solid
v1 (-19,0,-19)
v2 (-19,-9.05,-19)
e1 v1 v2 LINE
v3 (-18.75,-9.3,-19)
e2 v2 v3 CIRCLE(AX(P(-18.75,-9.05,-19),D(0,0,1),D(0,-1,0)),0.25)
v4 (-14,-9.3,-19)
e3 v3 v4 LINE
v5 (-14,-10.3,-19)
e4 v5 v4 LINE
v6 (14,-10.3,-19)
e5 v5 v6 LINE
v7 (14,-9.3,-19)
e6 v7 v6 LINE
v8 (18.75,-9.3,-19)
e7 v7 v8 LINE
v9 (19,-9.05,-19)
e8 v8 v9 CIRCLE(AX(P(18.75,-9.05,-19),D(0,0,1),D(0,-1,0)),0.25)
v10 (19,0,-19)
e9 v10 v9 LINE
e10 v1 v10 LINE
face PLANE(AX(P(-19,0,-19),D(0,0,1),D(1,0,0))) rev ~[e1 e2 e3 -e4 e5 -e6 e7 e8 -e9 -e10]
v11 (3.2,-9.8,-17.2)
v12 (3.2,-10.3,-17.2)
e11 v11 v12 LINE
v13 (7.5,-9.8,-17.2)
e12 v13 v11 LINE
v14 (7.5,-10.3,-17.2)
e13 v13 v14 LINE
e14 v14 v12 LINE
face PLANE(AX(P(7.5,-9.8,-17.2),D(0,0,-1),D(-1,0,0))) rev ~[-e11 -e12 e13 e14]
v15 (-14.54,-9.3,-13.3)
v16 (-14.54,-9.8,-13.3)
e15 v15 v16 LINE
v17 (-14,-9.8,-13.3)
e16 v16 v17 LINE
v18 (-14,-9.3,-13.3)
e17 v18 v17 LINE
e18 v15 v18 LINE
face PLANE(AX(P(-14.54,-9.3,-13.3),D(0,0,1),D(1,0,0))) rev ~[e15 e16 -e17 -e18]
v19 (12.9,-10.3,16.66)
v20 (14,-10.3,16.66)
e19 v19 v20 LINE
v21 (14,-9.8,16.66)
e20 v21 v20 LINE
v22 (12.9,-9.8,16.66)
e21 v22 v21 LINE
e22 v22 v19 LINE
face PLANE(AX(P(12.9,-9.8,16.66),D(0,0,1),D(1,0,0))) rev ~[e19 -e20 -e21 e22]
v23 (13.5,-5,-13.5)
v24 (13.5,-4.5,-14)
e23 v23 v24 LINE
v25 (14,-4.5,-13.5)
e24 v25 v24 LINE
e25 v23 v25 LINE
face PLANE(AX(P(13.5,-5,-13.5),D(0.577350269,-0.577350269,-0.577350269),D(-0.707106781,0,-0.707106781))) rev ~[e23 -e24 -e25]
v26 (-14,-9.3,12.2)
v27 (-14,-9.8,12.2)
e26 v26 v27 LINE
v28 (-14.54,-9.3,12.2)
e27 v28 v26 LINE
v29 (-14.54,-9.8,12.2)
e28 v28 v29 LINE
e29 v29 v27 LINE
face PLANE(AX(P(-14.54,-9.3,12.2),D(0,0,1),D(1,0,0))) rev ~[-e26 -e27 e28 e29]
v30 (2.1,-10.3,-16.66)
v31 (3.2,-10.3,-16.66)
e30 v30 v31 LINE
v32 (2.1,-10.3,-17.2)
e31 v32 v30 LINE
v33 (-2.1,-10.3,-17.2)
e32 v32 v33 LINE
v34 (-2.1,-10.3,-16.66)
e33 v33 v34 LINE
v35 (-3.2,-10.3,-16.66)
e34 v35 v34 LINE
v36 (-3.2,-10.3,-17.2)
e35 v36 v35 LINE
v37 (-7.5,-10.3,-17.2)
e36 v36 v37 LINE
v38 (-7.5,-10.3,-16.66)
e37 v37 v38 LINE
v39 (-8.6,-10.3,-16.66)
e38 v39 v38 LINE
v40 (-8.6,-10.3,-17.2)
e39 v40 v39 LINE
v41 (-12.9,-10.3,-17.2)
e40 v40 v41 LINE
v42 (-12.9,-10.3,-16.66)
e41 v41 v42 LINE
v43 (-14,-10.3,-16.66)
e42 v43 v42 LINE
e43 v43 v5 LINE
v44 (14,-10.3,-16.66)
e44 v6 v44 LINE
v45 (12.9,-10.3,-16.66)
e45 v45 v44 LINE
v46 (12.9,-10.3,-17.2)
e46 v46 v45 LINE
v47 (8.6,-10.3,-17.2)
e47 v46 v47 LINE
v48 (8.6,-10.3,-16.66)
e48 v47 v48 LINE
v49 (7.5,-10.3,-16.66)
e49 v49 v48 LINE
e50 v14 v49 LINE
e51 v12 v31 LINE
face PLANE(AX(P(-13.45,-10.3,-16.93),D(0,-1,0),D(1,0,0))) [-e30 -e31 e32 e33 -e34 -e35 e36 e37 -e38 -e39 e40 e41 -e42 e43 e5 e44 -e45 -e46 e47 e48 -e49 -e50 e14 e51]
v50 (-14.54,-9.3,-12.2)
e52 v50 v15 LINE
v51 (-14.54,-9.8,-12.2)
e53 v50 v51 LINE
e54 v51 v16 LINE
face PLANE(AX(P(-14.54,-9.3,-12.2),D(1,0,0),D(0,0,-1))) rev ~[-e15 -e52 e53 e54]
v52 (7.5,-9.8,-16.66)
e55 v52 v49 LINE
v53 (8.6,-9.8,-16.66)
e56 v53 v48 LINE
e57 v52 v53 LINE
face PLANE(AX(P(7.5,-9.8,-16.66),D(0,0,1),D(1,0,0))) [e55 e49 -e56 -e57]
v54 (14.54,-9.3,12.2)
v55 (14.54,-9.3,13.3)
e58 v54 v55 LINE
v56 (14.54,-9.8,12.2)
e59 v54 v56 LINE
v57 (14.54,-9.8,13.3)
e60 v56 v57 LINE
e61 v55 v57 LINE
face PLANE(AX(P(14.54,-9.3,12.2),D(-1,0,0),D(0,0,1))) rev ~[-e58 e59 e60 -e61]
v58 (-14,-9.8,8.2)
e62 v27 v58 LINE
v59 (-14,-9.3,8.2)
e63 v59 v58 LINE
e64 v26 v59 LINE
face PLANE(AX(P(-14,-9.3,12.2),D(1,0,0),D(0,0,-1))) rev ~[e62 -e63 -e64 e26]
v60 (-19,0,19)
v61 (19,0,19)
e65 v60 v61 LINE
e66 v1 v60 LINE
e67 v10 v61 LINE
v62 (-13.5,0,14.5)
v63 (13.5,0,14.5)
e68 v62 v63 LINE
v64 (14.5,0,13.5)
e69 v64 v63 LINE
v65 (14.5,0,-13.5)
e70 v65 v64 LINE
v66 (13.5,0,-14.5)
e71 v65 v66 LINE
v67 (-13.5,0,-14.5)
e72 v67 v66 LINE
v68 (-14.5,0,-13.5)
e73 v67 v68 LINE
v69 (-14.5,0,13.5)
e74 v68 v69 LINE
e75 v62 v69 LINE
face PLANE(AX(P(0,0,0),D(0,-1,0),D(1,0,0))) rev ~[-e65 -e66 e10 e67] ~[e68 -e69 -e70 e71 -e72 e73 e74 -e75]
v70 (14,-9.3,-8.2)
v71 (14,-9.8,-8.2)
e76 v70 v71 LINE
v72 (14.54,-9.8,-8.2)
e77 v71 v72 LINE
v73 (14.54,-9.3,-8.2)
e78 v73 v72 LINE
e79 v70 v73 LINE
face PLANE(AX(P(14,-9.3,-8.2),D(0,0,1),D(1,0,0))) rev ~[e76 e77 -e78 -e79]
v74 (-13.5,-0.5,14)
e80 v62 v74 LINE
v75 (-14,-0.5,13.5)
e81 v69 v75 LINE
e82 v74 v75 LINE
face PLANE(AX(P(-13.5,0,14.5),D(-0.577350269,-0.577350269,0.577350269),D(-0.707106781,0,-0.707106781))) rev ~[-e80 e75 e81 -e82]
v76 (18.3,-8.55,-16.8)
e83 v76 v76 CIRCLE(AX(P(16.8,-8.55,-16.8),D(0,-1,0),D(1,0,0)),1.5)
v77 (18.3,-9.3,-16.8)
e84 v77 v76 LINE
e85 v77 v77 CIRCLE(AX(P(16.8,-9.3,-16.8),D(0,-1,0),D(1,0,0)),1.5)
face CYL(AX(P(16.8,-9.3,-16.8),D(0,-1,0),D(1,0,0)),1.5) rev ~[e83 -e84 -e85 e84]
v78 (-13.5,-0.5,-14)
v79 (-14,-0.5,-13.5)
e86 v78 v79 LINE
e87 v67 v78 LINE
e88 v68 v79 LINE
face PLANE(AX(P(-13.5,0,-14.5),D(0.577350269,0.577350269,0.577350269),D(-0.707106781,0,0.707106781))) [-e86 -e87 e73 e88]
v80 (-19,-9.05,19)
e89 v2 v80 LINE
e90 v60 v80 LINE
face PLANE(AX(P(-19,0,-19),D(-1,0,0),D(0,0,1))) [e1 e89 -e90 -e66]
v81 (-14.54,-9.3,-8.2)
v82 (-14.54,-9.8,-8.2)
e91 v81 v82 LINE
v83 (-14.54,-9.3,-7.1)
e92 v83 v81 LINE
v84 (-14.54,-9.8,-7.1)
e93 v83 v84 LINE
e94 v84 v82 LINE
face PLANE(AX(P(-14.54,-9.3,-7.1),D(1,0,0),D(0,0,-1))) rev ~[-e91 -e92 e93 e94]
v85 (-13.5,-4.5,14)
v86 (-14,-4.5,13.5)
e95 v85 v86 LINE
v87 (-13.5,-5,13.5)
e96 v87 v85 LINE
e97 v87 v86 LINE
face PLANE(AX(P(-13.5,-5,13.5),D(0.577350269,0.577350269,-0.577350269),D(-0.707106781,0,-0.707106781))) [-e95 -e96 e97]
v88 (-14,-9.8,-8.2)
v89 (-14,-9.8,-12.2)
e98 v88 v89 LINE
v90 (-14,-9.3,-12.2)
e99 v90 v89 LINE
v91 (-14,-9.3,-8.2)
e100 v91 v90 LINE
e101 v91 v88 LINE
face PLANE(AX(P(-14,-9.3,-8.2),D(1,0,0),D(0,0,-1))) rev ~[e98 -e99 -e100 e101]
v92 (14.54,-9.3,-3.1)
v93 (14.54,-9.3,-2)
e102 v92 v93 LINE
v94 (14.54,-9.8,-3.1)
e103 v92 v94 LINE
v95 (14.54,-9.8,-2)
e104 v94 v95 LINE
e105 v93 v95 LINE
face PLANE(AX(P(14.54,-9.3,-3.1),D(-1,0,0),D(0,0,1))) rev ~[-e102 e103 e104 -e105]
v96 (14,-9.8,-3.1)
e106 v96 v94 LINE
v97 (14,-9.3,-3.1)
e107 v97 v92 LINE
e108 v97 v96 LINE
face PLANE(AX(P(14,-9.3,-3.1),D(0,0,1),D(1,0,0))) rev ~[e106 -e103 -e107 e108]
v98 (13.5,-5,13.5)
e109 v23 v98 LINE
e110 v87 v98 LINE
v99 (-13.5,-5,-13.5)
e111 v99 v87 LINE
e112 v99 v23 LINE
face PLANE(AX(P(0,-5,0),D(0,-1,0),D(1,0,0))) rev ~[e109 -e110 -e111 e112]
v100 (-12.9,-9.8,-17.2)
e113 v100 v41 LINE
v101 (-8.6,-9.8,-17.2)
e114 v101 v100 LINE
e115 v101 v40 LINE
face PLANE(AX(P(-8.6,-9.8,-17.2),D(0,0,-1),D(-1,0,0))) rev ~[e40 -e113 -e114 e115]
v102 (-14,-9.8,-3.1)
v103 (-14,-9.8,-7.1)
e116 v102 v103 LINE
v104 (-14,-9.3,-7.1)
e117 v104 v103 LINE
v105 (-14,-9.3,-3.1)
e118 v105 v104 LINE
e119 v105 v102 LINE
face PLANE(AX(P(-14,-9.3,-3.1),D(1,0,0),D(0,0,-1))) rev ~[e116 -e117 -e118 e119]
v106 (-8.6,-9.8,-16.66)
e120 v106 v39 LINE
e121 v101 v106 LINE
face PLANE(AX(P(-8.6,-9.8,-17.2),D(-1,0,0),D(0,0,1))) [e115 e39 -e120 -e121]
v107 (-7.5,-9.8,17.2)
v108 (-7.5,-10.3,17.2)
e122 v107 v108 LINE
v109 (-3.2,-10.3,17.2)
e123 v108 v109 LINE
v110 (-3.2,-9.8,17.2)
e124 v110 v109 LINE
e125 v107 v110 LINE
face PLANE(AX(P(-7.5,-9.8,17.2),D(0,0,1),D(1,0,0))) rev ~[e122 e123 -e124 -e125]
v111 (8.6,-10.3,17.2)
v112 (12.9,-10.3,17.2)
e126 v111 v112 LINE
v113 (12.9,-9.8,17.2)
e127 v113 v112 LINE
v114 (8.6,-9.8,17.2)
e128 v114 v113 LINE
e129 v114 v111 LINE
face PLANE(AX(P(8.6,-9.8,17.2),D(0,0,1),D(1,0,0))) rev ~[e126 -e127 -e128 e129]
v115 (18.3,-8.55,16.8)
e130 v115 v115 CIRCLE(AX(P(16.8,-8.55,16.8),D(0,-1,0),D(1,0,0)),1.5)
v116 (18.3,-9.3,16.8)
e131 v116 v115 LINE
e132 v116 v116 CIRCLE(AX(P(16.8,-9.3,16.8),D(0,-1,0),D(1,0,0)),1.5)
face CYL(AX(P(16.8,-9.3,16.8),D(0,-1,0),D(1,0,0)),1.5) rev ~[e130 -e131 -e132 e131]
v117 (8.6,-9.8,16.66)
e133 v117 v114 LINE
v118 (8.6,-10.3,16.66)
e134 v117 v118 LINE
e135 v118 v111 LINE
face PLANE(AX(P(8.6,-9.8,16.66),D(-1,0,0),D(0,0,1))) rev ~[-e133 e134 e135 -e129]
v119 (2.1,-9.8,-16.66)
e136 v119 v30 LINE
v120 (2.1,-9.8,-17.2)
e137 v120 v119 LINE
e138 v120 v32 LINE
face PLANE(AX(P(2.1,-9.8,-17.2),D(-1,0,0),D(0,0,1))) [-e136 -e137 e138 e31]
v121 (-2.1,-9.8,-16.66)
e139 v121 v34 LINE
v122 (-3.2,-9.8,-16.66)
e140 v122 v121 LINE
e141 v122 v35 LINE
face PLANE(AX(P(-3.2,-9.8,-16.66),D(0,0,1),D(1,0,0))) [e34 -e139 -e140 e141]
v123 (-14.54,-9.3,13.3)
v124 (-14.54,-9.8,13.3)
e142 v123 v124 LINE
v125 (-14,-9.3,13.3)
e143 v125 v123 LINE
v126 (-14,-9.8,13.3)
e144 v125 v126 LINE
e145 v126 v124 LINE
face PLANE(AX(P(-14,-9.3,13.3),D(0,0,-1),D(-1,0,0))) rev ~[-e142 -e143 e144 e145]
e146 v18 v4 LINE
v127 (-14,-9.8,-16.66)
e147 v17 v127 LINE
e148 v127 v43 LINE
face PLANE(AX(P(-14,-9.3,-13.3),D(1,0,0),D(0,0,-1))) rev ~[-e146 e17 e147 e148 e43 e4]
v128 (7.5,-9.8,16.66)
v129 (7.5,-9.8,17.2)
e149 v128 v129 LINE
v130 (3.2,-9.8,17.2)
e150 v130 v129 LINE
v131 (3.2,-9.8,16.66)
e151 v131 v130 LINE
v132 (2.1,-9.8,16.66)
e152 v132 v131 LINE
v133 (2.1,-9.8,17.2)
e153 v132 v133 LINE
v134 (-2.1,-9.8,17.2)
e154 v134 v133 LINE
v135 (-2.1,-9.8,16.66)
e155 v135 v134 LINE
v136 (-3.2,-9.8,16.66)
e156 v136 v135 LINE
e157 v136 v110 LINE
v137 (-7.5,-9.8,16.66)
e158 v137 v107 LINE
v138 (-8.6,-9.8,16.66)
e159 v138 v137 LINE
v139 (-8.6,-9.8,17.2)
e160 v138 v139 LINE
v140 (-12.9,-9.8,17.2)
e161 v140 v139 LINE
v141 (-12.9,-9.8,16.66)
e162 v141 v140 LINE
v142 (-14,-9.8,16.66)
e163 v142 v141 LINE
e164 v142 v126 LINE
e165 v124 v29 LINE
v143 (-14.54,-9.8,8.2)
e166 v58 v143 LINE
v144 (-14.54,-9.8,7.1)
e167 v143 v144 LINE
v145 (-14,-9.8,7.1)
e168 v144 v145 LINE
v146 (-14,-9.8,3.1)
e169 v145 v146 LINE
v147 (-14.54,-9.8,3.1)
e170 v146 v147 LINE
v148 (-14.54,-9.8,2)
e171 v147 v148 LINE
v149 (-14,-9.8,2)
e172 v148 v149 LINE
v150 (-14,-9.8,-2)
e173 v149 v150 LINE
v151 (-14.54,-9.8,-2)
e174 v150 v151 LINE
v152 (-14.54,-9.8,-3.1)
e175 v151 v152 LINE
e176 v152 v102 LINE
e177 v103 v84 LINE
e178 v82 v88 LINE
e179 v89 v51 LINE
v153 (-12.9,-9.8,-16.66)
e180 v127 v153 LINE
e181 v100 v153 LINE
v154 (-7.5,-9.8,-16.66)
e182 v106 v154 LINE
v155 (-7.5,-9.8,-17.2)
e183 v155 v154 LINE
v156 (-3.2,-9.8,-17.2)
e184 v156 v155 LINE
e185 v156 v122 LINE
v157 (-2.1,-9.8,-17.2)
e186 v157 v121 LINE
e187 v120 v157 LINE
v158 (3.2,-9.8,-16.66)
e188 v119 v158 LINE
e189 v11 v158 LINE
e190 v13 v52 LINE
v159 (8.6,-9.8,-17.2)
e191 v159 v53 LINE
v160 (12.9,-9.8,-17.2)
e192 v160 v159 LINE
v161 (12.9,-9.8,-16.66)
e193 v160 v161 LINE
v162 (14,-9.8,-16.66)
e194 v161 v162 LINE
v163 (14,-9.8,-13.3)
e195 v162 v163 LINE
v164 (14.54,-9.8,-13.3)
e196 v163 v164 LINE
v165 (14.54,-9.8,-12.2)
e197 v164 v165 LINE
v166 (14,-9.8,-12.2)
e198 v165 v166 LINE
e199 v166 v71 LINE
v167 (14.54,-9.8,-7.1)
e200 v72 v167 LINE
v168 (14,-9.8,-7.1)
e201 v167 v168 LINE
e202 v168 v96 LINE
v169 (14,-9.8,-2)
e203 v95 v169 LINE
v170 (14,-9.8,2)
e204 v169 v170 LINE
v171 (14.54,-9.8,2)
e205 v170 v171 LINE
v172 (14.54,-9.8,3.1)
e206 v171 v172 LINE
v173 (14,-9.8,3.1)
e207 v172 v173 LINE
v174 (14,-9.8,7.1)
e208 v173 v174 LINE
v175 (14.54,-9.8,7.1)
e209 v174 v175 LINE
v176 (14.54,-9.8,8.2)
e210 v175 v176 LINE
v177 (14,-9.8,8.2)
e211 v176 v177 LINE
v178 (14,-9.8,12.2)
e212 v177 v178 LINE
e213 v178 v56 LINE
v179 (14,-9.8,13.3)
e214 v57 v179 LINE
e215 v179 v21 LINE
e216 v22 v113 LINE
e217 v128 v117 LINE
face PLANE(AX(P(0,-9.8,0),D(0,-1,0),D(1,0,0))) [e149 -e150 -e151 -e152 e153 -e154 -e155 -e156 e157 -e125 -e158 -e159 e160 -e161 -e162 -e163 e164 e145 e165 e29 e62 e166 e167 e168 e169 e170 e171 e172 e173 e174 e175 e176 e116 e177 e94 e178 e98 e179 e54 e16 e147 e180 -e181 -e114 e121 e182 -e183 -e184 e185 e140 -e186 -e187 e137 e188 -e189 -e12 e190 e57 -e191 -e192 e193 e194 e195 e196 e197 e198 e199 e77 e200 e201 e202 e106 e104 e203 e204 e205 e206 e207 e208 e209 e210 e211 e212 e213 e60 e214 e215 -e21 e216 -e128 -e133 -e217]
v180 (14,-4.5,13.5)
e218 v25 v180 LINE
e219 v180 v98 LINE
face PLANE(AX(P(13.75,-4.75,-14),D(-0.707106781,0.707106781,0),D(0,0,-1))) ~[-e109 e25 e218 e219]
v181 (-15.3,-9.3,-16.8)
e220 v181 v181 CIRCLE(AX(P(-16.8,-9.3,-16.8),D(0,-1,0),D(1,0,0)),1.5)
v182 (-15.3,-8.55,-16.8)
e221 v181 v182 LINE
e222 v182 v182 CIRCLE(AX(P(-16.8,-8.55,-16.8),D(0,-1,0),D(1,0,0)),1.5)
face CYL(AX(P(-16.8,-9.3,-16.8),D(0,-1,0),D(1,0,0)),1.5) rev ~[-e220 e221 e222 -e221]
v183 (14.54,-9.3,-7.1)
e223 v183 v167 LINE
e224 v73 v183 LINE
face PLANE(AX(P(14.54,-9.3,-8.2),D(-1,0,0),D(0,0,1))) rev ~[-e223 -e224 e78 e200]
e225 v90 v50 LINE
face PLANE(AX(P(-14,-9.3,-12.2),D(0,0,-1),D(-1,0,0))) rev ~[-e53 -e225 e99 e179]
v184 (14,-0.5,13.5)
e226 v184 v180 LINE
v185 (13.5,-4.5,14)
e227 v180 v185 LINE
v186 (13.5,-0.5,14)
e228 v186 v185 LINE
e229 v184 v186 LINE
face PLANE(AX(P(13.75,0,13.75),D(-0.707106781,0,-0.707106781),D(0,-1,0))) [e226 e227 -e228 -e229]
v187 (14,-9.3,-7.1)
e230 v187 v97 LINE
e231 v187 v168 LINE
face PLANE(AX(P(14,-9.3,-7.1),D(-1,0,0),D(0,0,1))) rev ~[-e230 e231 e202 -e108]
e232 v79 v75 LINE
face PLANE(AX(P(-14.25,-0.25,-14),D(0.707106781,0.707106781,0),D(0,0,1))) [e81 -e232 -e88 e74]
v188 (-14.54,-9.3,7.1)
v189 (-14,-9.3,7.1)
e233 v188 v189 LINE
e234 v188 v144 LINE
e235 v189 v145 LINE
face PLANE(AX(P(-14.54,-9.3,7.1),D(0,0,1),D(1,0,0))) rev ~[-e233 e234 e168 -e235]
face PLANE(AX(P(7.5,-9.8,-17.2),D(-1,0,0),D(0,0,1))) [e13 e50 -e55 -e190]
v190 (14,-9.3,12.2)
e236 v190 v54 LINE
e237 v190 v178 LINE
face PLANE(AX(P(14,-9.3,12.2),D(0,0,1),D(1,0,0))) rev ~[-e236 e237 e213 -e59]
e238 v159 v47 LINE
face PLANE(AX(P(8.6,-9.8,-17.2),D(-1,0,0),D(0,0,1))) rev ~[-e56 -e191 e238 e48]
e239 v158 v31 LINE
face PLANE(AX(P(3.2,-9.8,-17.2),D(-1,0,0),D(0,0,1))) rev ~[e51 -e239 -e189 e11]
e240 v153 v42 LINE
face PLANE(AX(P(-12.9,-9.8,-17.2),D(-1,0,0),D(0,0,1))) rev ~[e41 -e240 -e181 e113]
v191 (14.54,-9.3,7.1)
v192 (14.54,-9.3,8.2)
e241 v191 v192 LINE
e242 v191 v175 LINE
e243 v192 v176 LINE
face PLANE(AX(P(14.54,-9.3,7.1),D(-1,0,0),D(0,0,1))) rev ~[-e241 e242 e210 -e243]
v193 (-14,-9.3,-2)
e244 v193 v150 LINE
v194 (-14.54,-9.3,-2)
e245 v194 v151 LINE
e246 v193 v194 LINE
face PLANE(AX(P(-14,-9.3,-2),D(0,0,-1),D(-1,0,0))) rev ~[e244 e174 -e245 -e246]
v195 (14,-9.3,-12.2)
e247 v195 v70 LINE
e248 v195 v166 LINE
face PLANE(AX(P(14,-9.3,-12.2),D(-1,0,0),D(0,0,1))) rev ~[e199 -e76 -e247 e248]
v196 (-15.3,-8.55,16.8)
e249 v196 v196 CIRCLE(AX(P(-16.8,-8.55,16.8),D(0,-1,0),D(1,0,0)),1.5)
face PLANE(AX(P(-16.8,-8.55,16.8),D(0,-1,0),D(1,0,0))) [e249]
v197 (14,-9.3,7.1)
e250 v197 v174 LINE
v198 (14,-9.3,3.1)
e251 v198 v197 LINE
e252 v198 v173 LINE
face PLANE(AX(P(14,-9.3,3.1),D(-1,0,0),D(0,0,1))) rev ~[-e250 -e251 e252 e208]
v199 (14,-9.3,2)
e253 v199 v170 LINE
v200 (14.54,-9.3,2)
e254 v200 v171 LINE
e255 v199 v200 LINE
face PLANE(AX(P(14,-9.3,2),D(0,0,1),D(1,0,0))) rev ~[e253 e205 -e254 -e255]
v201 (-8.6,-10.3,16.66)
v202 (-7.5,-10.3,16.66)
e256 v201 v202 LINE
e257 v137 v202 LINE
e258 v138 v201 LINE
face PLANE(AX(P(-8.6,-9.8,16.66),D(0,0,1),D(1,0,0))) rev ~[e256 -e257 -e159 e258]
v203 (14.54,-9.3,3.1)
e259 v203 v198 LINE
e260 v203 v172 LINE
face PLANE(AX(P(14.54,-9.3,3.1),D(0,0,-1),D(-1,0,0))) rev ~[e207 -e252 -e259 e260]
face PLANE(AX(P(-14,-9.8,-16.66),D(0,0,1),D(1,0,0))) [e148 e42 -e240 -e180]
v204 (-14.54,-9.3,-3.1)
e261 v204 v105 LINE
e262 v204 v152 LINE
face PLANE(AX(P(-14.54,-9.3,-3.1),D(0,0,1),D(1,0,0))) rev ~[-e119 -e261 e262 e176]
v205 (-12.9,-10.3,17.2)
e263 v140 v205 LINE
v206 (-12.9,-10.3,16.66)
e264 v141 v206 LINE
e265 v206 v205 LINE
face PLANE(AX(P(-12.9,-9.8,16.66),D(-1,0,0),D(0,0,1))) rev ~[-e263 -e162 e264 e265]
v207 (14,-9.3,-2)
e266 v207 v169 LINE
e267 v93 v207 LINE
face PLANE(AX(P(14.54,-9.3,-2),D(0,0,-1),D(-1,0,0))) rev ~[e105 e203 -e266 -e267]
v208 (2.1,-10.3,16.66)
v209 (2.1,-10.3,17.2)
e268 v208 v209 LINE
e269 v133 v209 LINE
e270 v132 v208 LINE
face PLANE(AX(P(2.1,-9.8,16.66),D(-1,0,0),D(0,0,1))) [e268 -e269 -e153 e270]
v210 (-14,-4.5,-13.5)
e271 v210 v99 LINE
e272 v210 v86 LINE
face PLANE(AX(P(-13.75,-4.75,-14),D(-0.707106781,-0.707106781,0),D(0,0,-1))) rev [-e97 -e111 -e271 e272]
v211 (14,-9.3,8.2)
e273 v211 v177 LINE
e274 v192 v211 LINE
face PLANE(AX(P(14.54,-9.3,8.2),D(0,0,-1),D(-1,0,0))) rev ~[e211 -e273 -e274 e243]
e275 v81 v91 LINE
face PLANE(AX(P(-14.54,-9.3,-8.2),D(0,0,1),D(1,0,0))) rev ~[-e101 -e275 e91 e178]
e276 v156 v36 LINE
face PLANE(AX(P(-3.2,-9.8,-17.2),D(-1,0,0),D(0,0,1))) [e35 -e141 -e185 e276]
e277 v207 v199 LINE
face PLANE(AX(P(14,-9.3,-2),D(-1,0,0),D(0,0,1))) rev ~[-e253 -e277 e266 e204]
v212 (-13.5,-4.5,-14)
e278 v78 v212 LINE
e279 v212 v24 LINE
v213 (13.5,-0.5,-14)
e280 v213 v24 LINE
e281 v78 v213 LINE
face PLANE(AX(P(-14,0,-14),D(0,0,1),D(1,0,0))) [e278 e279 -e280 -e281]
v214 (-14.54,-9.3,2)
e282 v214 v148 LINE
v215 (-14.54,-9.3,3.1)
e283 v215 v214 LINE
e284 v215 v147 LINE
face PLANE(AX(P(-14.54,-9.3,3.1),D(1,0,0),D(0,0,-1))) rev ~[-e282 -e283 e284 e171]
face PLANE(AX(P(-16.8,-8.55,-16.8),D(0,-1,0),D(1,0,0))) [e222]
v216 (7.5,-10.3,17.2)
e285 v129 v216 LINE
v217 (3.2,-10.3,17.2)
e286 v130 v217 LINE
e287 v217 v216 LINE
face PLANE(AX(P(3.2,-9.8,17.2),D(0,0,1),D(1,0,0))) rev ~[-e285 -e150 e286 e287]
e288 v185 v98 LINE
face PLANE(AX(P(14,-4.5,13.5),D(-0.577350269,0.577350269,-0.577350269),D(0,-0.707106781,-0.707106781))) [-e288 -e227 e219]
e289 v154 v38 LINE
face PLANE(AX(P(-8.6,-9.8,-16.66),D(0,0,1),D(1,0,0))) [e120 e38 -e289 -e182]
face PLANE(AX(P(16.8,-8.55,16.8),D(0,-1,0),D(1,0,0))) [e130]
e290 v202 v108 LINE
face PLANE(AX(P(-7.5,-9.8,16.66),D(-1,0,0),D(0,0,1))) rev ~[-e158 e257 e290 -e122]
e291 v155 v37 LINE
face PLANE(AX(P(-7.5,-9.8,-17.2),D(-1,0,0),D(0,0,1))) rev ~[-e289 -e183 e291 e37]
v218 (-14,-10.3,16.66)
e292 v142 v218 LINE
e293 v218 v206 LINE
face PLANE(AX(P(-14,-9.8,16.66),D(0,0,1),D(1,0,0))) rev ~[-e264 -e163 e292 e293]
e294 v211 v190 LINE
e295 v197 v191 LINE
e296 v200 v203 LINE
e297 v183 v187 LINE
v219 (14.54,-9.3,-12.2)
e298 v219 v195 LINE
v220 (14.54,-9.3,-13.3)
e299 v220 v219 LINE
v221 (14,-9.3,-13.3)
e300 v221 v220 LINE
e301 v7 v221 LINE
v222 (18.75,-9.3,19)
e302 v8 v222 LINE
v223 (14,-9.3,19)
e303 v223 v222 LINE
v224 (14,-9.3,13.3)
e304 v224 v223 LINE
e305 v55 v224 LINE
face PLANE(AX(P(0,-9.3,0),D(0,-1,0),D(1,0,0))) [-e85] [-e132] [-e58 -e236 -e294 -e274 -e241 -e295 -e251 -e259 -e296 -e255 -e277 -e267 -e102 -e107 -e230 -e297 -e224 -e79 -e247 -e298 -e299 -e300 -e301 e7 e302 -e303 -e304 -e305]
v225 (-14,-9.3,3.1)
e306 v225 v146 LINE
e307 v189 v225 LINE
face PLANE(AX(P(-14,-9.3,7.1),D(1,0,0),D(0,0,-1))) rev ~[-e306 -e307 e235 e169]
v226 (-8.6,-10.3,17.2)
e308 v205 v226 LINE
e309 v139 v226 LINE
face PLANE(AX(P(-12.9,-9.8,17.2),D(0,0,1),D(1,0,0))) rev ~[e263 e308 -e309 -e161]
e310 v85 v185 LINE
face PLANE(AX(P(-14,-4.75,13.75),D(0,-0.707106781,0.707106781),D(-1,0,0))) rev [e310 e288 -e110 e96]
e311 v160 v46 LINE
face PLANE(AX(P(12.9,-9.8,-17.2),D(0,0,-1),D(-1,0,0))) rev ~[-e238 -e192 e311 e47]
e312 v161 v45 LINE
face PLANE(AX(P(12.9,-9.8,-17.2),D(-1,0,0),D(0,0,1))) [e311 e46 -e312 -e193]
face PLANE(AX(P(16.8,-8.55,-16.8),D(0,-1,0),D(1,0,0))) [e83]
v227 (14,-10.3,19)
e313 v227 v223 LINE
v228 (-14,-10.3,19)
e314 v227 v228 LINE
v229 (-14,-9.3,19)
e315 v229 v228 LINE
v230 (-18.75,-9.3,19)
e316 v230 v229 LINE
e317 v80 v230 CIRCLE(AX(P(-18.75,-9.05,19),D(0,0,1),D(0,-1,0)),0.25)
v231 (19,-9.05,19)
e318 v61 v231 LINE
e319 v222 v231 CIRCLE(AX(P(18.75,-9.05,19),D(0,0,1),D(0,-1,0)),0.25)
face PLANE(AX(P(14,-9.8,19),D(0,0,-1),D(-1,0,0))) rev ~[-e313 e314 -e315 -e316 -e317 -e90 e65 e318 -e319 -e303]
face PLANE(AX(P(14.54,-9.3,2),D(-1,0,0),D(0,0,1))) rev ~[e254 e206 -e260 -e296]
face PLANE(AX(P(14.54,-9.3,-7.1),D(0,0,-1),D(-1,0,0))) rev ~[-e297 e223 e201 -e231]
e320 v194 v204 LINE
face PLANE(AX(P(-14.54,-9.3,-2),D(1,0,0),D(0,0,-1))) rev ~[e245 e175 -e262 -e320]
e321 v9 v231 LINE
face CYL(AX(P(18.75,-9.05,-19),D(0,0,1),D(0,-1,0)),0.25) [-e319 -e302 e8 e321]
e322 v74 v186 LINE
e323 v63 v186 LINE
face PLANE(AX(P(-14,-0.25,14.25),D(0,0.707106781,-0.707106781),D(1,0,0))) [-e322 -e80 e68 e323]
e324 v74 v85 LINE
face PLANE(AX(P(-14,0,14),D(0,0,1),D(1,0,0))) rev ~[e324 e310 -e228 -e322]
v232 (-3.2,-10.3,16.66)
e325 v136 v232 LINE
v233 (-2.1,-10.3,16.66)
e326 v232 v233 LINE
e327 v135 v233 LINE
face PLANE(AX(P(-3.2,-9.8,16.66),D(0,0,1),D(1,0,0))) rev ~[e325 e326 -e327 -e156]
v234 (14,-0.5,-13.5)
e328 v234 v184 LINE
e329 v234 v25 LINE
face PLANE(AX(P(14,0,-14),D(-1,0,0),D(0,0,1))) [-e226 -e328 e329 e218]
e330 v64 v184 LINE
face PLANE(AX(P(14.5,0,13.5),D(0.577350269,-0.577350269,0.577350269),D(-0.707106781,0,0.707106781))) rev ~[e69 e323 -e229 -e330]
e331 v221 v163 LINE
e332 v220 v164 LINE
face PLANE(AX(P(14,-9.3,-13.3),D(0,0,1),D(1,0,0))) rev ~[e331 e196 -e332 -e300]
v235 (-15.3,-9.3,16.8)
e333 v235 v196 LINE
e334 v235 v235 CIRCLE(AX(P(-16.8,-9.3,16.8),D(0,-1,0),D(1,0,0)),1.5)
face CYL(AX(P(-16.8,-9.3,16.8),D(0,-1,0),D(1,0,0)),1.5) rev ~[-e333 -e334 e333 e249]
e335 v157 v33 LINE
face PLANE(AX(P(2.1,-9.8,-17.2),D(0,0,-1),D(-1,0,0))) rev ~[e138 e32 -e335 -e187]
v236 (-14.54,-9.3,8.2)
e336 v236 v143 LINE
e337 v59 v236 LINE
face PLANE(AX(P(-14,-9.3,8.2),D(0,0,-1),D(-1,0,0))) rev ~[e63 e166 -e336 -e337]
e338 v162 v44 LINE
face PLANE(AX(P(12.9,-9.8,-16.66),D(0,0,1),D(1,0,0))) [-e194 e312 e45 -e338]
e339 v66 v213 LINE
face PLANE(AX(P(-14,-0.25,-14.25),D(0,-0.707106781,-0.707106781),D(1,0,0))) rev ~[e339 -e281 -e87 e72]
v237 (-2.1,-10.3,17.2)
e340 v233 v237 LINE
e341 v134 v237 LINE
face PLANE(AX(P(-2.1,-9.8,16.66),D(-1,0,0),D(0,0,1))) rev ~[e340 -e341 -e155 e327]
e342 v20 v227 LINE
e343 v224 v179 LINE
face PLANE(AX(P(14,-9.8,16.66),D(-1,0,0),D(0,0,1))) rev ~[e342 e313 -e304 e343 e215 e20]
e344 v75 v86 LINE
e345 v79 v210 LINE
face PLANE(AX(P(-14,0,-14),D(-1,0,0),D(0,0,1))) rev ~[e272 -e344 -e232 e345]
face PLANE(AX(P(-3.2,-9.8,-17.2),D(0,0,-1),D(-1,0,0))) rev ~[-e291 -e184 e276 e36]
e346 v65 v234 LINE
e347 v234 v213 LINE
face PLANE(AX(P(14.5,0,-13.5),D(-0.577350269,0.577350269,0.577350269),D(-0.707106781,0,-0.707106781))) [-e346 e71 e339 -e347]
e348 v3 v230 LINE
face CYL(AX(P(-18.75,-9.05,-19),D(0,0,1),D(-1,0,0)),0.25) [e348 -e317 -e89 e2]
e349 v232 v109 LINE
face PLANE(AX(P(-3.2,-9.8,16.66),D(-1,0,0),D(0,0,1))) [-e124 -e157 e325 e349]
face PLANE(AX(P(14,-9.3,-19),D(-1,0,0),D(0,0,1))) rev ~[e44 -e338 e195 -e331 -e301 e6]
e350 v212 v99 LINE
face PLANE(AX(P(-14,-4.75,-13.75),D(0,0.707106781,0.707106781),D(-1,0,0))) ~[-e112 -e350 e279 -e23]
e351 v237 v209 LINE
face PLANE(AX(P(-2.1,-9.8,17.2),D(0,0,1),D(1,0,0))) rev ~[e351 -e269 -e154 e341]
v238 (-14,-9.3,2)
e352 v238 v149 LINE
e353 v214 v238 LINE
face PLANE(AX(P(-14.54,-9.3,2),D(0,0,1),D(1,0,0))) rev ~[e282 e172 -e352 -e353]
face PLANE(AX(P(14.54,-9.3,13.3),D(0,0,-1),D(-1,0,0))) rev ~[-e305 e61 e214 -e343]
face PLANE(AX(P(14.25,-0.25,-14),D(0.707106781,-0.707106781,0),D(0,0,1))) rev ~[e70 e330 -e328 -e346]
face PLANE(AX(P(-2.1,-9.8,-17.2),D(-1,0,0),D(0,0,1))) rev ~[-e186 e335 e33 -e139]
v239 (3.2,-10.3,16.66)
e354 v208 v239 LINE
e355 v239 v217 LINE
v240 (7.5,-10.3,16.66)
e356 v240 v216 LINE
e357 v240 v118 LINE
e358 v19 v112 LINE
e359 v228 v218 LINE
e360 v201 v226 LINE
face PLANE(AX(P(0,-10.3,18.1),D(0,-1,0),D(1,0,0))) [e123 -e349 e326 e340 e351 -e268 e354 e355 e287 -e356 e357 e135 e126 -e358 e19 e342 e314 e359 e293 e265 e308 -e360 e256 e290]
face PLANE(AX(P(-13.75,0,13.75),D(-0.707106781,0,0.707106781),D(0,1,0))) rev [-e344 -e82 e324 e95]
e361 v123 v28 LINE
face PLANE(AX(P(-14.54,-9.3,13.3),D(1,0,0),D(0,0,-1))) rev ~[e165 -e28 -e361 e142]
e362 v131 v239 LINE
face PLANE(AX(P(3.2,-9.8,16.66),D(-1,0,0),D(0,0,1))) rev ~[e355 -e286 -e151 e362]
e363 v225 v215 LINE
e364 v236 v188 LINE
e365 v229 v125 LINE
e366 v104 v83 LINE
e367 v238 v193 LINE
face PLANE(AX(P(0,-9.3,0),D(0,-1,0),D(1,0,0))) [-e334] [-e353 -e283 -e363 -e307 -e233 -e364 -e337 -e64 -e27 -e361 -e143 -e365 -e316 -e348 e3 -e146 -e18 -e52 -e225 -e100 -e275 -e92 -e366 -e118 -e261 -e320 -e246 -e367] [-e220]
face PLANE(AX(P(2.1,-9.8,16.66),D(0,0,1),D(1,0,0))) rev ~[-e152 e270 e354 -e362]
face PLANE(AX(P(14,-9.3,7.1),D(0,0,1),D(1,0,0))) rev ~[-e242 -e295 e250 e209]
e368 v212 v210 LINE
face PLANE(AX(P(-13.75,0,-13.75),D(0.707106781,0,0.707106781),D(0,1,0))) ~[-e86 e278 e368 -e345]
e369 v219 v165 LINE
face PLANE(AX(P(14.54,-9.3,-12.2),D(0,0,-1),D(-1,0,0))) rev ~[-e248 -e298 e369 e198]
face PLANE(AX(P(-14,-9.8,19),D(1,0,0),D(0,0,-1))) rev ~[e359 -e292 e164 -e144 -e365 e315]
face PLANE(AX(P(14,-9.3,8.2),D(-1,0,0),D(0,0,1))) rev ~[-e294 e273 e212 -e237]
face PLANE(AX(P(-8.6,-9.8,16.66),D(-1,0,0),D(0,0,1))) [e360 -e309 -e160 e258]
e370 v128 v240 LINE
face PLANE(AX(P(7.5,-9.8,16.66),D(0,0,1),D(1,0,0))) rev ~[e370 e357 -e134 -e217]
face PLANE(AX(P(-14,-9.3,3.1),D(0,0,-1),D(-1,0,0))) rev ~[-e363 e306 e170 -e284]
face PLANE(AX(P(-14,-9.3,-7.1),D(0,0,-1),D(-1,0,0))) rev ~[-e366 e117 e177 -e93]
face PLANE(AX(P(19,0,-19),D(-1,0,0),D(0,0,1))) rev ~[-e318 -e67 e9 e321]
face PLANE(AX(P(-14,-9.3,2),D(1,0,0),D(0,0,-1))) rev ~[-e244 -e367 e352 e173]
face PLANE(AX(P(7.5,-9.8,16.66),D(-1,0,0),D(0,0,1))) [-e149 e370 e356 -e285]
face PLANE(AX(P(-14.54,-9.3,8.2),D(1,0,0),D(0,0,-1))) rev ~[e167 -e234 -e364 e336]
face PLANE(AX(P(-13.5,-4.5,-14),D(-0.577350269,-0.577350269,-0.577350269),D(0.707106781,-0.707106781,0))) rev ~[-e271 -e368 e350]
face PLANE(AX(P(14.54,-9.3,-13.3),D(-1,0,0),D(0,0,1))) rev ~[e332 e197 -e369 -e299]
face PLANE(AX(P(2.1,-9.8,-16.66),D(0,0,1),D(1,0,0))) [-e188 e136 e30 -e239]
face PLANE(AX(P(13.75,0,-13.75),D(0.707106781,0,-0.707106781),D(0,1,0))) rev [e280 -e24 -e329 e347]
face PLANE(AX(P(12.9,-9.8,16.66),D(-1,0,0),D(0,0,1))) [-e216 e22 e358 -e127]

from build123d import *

# Parameters (mm, degrees)
F0_W      = 38
F0_H      = 38
F1_DEPTH  = 9.3
F2_R      = 1.5
F3_DEPTH  = 0.75
F5_DEPTH  = 0.5
F6_W      = 1.1
F6_H      = 0.54
F7_DEPTH  = 0.5
F8_R      = 0.25
F9_W      = 28
F9_H      = 28
F10_DEPTH = 5
F11_SIZE  = 0.5


with BuildPart() as f1:
    # F0 (on Front) → F1 (new body)
    with BuildSketch(Plane.XZ):
        Rectangle(F0_W, F0_H)
    extrude(amount=F1_DEPTH)

    # F2 (on face) → F3 (cut)
    with BuildSketch(Plane.XZ.offset(9.3)):
        with Locations((-16.8, 16.8)):
            Circle(F2_R)
        with Locations((16.8, 16.8)):
            Circle(F2_R)
        with Locations((16.8, -16.8)):
            Circle(F2_R)
        with Locations((-16.8, -16.8)):
            Circle(F2_R)
    extrude(amount=-F3_DEPTH, mode=Mode.SUBTRACT)

    # F4 (on face) → F5 (join)
    with BuildSketch(Plane.XZ.offset(9.3)):
        Polygon((14, 19), (0, 19), (-14, 19), (-14, 13.3), (-14.54, 13.3), (-14.54, 12.2), (-14, 12.2), (-14, 8.2), (-14.54, 8.2), (-14.54, 7.1), (-14, 7.1), (-14, 3.1), (-14.54, 3.1), (-14.54, 2), (-14, 2), (-14, -2), (-14.54, -2), (-14.54, -3.1), (-14, -3.1), (-14, -7.1), (-14.54, -7.1), (-14.54, -8.2), (-14, -8.2), (-14, -12.2), (-14.54, -12.2), (-14.54, -13.3), (-14, -13.3), (-14, -19), (0, -19), (14, -19), (14, -13.3), (14.54, -13.3), (14.54, -12.2), (14, -12.2), (14, -8.2), (14.54, -8.2), (14.54, -7.1), (14, -7.1), (14, -3.1), (14.54, -3.1), (14.54, -2), (14, -2), (14, 2), (14.54, 2), (14.54, 3.1), (14, 3.1), (14, 7.1), (14.54, 7.1), (14.54, 8.2), (14, 8.2), (14, 12.2), (14.54, 12.2), (14.54, 13.3), (14, 13.3), align=None)
    extrude(amount=F5_DEPTH)

    # F6 (on face) → F7 (join)
    with BuildSketch(Plane.XZ.offset(9.8)):
        Polygon((14, 17.2), (14, 19), (-14, 19), (-14, 17.2), (-12.9, 17.2), (-8.6, 17.2), (-7.5, 17.2), (-3.2, 17.2), (-2.1, 17.2), (2.1, 17.2), (3.2, 17.2), (7.5, 17.2), (8.6, 17.2), (12.9, 17.2), align=None)
        with Locations((13.45, 16.93)):
            Rectangle(F6_W, F6_H)
        with Locations((-13.45, 16.93)):
            Rectangle(F6_W, F6_H)
        with Locations((8.05, 16.93)):
            Rectangle(F6_W, F6_H)
        with Locations((-8.05, 16.93)):
            Rectangle(F6_W, F6_H)
        with Locations((2.65, 16.93)):
            Rectangle(F6_W, F6_H)
        with Locations((-2.65, 16.93)):
            Rectangle(F6_W, F6_H)
        with Locations((-13.45, -16.93)):
            Rectangle(F6_W, F6_H)
        Polygon((-12.9, -17.2), (-14, -17.2), (-14, -19), (14, -19), (14, -17.2), (12.9, -17.2), (8.6, -17.2), (7.5, -17.2), (3.2, -17.2), (2.1, -17.2), (-2.1, -17.2), (-3.2, -17.2), (-7.5, -17.2), (-8.6, -17.2), align=None)
        with Locations((-8.05, -16.93)):
            Rectangle(F6_W, F6_H)
        with Locations((13.45, -16.93)):
            Rectangle(F6_W, F6_H)
        with Locations((-2.65, -16.93)):
            Rectangle(F6_W, F6_H)
        with Locations((8.05, -16.93)):
            Rectangle(F6_W, F6_H)
        with Locations((2.65, -16.93)):
            Rectangle(F6_W, F6_H)
    extrude(amount=F7_DEPTH)

    # F8
    f8_edges = [f1.edges().sort_by_distance(p)[0] for p in [
        (-19, -9.3, 0),
        (19, -9.3, 0),
    ]]
    fillet(f8_edges, radius=F8_R)

    # F9 (on face) → F10 (cut)
    with BuildSketch(Plane.XZ):
        Rectangle(F9_W, F9_H)
    extrude(amount=F10_DEPTH, mode=Mode.SUBTRACT)

    # F11
    f11_edges = [f1.edges().sort_by_distance(p)[0] for p in [
        (-14, -2.5, 14),
        (0, -5, 14),
        (-14, -5, 0),
        (14, -2.5, 14),
        (14, -2.5, -14),
        (14, 0, 0),
        (14, -5, 0),
        (-14, -2.5, -14),
        (0, 0, -14),
        (0, -5, -14),
        (0, 0, 14),
        (-14, 0, 0),
    ]]
    chamfer(f11_edges, length=F11_SIZE)


solid = f1.part
